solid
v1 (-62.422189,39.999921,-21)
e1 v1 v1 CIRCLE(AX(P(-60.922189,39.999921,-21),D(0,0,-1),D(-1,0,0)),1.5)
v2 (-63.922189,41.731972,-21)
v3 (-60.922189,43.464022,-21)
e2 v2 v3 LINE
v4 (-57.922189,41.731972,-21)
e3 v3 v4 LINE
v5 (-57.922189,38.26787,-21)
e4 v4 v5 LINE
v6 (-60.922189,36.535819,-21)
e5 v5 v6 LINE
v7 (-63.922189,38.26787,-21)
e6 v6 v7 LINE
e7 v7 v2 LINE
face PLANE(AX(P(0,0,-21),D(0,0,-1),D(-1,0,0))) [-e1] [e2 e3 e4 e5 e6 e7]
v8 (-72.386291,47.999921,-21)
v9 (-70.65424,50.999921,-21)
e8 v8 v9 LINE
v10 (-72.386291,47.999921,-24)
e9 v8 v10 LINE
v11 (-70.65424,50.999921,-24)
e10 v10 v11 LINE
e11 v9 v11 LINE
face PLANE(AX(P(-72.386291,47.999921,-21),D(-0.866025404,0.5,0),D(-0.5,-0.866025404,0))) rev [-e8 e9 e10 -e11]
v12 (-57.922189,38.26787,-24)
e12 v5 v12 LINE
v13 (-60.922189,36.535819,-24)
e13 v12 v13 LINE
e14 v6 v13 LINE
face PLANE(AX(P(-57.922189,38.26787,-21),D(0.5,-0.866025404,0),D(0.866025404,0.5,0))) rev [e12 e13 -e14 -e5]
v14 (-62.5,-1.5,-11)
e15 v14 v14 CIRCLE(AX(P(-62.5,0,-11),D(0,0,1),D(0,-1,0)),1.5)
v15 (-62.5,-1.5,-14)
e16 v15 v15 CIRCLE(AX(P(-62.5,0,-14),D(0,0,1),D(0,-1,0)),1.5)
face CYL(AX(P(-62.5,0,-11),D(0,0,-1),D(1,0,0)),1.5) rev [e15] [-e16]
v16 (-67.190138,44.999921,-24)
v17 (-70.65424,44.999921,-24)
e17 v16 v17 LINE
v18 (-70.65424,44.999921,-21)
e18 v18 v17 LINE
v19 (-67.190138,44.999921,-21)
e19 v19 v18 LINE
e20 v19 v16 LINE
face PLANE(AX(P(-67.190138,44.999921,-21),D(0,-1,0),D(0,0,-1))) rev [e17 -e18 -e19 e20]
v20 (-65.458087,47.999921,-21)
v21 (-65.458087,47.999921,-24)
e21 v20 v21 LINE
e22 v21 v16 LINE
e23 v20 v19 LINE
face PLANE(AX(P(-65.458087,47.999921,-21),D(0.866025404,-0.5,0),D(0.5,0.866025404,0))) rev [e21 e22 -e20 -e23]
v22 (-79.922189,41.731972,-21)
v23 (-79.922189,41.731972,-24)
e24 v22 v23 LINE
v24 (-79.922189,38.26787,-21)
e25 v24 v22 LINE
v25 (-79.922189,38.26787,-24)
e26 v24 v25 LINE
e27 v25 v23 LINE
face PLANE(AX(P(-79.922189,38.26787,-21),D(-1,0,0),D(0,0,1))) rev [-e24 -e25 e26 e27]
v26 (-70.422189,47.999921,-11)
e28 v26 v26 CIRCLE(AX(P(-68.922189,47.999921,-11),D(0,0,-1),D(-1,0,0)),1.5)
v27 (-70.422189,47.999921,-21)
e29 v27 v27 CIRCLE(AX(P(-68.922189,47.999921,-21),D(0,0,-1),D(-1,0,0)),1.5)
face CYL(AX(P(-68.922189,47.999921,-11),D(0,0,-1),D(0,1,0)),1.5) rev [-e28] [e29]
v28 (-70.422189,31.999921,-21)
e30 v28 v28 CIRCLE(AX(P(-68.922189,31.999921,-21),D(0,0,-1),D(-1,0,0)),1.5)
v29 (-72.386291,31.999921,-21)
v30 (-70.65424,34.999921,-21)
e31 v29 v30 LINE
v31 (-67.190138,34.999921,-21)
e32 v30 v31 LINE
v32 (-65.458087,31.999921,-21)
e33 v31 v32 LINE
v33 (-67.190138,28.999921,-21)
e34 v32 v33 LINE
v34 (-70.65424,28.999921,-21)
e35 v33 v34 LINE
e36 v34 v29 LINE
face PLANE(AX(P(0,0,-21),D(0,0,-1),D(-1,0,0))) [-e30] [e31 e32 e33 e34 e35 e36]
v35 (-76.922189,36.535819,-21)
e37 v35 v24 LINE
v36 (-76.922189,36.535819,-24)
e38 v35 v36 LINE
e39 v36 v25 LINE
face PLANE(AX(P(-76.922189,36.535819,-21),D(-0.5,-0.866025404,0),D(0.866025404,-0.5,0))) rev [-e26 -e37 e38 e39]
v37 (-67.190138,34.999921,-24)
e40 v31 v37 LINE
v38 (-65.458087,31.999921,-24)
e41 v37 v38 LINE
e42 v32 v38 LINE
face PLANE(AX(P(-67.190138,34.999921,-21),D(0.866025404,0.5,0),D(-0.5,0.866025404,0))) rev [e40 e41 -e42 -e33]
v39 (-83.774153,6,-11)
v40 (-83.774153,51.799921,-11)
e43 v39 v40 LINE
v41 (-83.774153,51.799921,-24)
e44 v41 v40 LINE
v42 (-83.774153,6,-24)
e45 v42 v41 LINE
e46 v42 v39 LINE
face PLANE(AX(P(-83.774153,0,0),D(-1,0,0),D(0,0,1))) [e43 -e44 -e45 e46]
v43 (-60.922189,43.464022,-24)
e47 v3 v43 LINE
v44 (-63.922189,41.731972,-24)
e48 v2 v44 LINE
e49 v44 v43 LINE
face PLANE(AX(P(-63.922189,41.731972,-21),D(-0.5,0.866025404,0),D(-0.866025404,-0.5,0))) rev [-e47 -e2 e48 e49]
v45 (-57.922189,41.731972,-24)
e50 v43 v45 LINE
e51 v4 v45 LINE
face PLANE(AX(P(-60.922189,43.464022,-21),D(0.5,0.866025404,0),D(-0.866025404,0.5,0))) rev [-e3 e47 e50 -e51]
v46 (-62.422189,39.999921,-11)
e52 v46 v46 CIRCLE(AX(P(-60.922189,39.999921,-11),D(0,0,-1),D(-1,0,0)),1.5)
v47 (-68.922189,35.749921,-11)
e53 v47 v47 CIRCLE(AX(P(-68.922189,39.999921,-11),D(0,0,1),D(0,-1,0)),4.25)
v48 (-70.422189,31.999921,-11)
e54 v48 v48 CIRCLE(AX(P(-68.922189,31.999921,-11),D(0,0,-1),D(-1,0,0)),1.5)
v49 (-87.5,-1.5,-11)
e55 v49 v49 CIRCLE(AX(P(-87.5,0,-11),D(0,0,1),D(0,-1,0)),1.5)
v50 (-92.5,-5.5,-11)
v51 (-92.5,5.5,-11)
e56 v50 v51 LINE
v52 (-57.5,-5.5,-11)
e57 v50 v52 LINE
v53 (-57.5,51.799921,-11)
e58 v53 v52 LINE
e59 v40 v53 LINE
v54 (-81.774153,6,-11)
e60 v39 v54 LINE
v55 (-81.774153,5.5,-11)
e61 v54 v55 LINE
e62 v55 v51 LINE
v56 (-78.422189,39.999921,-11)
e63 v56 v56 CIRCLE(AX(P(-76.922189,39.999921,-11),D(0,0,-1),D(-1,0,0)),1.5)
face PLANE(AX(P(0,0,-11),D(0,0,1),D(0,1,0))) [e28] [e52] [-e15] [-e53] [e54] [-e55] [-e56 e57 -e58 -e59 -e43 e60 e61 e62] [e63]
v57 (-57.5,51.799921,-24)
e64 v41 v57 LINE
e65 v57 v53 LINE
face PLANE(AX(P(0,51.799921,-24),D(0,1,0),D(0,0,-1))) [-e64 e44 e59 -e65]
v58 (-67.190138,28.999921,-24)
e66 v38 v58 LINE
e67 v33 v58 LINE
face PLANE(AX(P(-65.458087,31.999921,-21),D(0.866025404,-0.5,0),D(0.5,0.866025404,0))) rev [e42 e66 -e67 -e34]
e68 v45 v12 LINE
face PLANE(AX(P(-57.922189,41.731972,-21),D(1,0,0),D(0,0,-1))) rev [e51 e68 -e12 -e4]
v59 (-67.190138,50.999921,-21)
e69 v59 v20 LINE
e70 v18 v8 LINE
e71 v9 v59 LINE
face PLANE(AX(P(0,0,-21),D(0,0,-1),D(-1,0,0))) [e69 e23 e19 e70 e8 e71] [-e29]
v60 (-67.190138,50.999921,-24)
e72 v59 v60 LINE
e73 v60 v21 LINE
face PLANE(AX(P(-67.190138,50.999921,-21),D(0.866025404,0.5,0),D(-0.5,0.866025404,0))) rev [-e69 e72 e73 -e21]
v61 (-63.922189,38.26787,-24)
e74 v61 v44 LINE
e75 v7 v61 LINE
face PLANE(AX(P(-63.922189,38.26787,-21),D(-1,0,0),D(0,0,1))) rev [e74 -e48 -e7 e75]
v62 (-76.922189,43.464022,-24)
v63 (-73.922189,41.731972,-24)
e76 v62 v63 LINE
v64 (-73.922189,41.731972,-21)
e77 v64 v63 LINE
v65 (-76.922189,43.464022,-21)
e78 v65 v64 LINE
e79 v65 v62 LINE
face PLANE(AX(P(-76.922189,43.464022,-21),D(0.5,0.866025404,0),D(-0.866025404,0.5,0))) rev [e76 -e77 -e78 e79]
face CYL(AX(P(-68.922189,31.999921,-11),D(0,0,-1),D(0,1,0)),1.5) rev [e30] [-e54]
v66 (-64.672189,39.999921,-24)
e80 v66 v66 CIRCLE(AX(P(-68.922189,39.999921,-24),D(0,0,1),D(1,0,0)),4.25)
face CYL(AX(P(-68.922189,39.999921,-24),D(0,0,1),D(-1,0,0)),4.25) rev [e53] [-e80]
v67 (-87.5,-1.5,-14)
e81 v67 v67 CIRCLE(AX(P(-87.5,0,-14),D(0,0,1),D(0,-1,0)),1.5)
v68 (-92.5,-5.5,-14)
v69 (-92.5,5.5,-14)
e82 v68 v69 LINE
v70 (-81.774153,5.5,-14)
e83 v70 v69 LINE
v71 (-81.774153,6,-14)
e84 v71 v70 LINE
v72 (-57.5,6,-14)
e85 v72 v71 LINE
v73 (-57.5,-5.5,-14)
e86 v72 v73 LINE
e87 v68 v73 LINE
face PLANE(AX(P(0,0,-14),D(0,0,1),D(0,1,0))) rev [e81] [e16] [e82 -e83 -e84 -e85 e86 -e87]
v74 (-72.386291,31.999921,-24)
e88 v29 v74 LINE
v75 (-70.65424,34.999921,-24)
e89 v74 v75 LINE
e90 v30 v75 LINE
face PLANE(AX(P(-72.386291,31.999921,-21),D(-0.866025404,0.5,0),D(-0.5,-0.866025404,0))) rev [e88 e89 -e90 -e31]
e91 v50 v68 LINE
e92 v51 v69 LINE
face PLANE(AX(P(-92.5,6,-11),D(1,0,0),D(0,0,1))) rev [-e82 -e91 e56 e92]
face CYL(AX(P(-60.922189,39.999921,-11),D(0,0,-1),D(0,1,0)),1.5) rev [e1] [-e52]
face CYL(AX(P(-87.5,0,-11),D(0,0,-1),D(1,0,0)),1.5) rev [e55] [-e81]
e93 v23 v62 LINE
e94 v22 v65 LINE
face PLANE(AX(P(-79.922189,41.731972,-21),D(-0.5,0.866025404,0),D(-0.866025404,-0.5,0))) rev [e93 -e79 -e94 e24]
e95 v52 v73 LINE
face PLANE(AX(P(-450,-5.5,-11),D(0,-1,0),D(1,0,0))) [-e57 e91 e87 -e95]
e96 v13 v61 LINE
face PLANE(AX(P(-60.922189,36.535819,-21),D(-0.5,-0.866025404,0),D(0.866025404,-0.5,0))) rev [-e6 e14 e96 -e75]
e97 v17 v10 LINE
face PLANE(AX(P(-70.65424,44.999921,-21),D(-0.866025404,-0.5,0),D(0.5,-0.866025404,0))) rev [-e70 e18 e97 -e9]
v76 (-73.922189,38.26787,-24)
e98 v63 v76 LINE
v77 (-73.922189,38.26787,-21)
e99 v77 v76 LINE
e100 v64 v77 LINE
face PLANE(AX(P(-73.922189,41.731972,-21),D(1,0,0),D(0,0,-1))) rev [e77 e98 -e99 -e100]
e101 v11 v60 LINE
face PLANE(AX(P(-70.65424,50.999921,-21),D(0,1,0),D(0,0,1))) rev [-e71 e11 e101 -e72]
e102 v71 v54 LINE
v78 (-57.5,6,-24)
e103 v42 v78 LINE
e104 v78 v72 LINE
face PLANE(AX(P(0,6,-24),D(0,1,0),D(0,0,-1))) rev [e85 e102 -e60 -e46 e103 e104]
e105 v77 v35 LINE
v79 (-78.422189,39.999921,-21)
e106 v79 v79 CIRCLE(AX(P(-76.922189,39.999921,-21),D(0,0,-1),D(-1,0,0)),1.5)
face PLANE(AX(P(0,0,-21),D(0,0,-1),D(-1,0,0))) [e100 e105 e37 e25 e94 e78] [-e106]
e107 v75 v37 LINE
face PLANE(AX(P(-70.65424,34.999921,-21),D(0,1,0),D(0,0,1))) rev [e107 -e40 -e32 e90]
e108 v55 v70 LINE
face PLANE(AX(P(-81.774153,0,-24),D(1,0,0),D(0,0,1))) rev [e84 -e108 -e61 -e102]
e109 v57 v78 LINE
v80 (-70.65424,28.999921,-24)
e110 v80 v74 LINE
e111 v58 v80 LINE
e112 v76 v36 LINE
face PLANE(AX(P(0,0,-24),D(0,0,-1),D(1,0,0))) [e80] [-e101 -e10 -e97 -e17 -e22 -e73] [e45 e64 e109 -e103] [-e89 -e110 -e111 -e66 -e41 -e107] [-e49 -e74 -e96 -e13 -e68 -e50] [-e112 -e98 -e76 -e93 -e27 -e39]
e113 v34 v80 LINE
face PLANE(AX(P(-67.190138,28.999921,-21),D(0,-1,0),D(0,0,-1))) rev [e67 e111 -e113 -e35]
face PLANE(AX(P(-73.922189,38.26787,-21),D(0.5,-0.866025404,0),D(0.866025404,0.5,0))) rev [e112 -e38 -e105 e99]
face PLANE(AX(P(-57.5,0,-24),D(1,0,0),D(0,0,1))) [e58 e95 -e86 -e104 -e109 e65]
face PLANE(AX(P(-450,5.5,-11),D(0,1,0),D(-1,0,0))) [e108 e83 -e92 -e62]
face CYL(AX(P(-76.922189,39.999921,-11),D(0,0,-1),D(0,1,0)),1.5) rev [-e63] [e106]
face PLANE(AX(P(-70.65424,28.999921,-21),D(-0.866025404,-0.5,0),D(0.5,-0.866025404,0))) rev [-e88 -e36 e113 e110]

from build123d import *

# Parameters (mm, degrees)
SKETCH1_W                   = 24.274152735811775
SKETCH1_H                   = 45.79992080637105
SKETCH1_R                   = 4.250000000000006
BOSS_EXTRUDE1_DEPTH         = 2
SKETCH1_3_W                 = 24.274152735811775
SKETCH1_3_H                 = 2
SKETCH1_3_H_2               = 43.79992080637105
BOSS_EXTRUDE2_DEPTH         = 8
BOSS_EXTRUDE3_START         = -8
SKETCH1_4_W                 = 24.274152735811775
SKETCH1_4_H                 = 43.79992080637105
SKETCH1_4_H_2               = 2
SKETCH1_4_R                 = 1.500000000000004
SKETCH1_4_R_2               = 1.4999999999999971
BOSS_EXTRUDE3_DEPTH         = 3
BODY_MOVE_COPY1_START       = -81.774152736
BODY_MOVE_COPY1_OUTLINE_W   = 13.599999999999994
BODY_MOVE_COPY1_OUTLINE_H   = 22
BODY_MOVE_COPY1_DEPTH       = 24.274152736
BODY_MOVE_COPY1_2_OUTLINE_W = 13.599999999999994
BODY_MOVE_COPY1_2_OUTLINE_H = 22
BODY_MOVE_COPY1_2_DEPTH     = 8.925981831
BODY_MOVE_COPY1_START_2     = -64.996207244
BODY_MOVE_COPY1_3_OUTLINE_W = 13.599999999999994
BODY_MOVE_COPY1_3_OUTLINE_H = 22
BODY_MOVE_COPY1_3_DEPTH     = 7.496207244
BODY_MOVE_COPY1_START_3     = -92.5
BODY_MOVE_COPY1_4_OUTLINE_W = 11
BODY_MOVE_COPY1_4_OUTLINE_H = 6.000000000000002
BODY_MOVE_COPY1_4_DEPTH     = 10.725847264
BODY_MOVE_COPY1_START_4     = -11
BODY_MOVE_COPY1_5_DEPTH     = 13
BODY_MOVE_COPY1_START_5     = -22
BODY_MOVE_COPY1_6_OUTLINE_R = 1.5
BODY_MOVE_COPY1_6_DEPTH     = 11
BODY_MOVE_COPY1_START_6     = -24
BODY_MOVE_COPY1_7_OUTLINE_R = 4.25
BODY_MOVE_COPY1_7_DEPTH     = 2
SKETCH2_R                   = 2.4999999999999956
SKETCH2_R_2                 = 1.7499999999999991
BOSS_EXTRUDE4_DEPTH         = 2
SKETCH2_R_3                 = 2.499999999999995
SKETCH2_R_4                 = 1.7500000000000013
BOSS_EXTRUDE4_2_DEPTH       = 2
BOSS_EXTRUDE5_START         = 2
SKETCH2_3_R                 = 2.499999999999995
SKETCH2_3_R_2               = 2.4999999999999956
BOSS_EXTRUDE5_DEPTH         = 10
BOSS_EXTRUDE8_START         = 2
BOSS_EXTRUDE8_OUTLINE_R     = 2.5
BOSS_EXTRUDE8_OUTLINE_R_2   = 1.75
BOSS_EXTRUDE8_DEPTH         = 10
BOSS_EXTRUDE8_2_OUTLINE_R   = 2.5
BOSS_EXTRUDE8_2_OUTLINE_R_2 = 1.5
BOSS_EXTRUDE8_2_DEPTH       = 12
BOSS_EXTRUDE9_START         = -22
SKETCH1_5_R                 = 4.250000000000006
BOSS_EXTRUDE9_DEPTH         = 11
SKETCH3_R                   = 4.250000000000006
SKETCH3_R_2                 = 1.4999999999999973
SKETCH3_R_3                 = 1.4999999999999822
CUT_EXTRUDE1_DEPTH          = 3
SKETCH3_2_R                 = 1.4999999999999822
SKETCH3_2_R_2               = 1.4999999999999973
CUT_EXTRUDE2_DEPTH          = 112.56199728722034
CUT_EXTRUDE3_DEPTH          = 69.81517846049216
BOSS_EXTRUDE10_DEPTH        = 2


with BuildPart() as part:
    # Sketch1 → Boss-Extrude1 (new body)
    with BuildSketch(Plane.XY):
        with Locations((-69.63707636790589, 28.899960403185524)):
            Rectangle(SKETCH1_W, SKETCH1_H)
        with Locations((-68.92218907483289, 39.99992080637105)):
            Circle(SKETCH1_R, mode=Mode.SUBTRACT)
    extrude(amount=BOSS_EXTRUDE1_DEPTH)

    # Sketch1<3> → Boss-Extrude2 (add)
    # profile 1 of 2: a face of its own
    with BuildSketch(Plane.XY):
        with Locations((-69.63707636790589, 7)):
            Rectangle(SKETCH1_3_W, SKETCH1_3_H)
    # profile 2 of 2: a face of its own
    with BuildSketch(Plane.XY):
        with Locations((-69.63707636790589, 29.899960403185524)):
            Rectangle(SKETCH1_3_W, SKETCH1_3_H_2)
        Polygon((-61.07022541385397, 39.99992080637103), (-64.99620724434341, 33.19992080637105), (-72.84817090532232, 33.19992080637105), (-76.77415273581178, 39.999920806371065), (-72.84817090532235, 46.79992080637104), (-64.99620724434344, 46.79992080637104), align=None, mode=Mode.SUBTRACT)
    extrude(amount=-BOSS_EXTRUDE2_DEPTH)

    # Sketch1<4> → Boss-Extrude3 (add)
    # profile 1 of 7: a face of its own
    with BuildSketch(Plane.XY.offset(BOSS_EXTRUDE3_START)):
        with Locations((-69.63707636790589, 29.899960403185524)):
            Rectangle(SKETCH1_4_W, SKETCH1_4_H)
        Polygon((-61.07022541385397, 39.99992080637103), (-64.99620724434341, 33.19992080637105), (-72.84817090532232, 33.19992080637105), (-76.77415273581178, 39.999920806371065), (-72.84817090532235, 46.79992080637104), (-64.99620724434344, 46.79992080637104), align=None, mode=Mode.SUBTRACT)
    # profile 2 of 7: a face of its own
    with BuildSketch(Plane.XY.offset(BOSS_EXTRUDE3_START)):
        Polygon((-67.5, -5.500000000000001), (-67.5, 5.5), (-57.5, 5.5), (-57.49999999999999, -5.5), align=None)
        Polygon((-59.03589838486225, -2.082e-14), (-60.76794919243112, 2.999999999999975), (-64.23205080756887, 2.999999999999975), (-65.96410161513775, -2.776e-14), (-64.23205080756888, -3.0000000000000098), (-60.767949192431125, -3.0000000000000098), align=None, mode=Mode.SUBTRACT)
    # profile 3 of 7: a face of its own
    with BuildSketch(Plane.XY.offset(BOSS_EXTRUDE3_START)):
        Polygon((-67.5, 5.5), (-57.5, 5.5), (-57.5, 6), (-81.77415273581178, 6), (-81.77415273581178, 5.5), align=None)
    # profile 4 of 7: a face of its own
    with BuildSketch(Plane.XY.offset(BOSS_EXTRUDE3_START)):
        with Locations((-69.63707636790589, 7)):
            Rectangle(SKETCH1_4_W, SKETCH1_4_H_2)
    # profile 5 of 7: a face of its own
    with BuildSketch(Plane.XY.offset(BOSS_EXTRUDE3_START)):
        Polygon((-81.77415273581178, -5.500000000000003), (-67.5, -5.500000000000001), (-67.5, 5.499999999999999), (-81.77415273581178, 5.499999999999997), align=None)
    # profile 6 of 7: a face of its own
    with BuildSketch(Plane.XY.offset(BOSS_EXTRUDE3_START)):
        Polygon((-60.767949192431125, -3.0000000000000098), (-59.03589838486225, -2.082e-14), (-60.76794919243112, 2.999999999999975), (-64.23205080756887, 2.999999999999975), (-65.96410161513775, -2.776e-14), (-64.23205080756888, -3.0000000000000098), align=None)
        with Locations(Location((-62.5, 0, 0), (0, 0, 270))):
            Circle(SKETCH1_4_R, mode=Mode.SUBTRACT)
    # profile 7 of 7: a face of its own
    with BuildSketch(Plane.XY.offset(BOSS_EXTRUDE3_START)):
        Polygon((-92.5, -5.500000000000004), (-92.5, 5.499999999999996), (-81.77415273581178, 5.499999999999997), (-81.77415273581178, -5.500000000000003), align=None)
        with Locations(Location((-87.5, -2.42e-15, 0), (0, 0, 270))):
            Circle(SKETCH1_4_R_2, mode=Mode.SUBTRACT)
    extrude(amount=-BOSS_EXTRUDE3_DEPTH)

    # Body-Move/Copy1: read off the stored shape, not the designer's step
    # Body-Move/Copy1 outline → Body-Move/Copy1 (add)
    with BuildSketch(Plane.YZ.offset(BODY_MOVE_COPY1_START)):
        Polygon((6, -24), (51.799920806, -24), (51.799920806, 2), (6, 2), (6, -8), (-5.5, -8), (-5.5, -14), (6, -14), align=None)
        with Locations((39.999920806, -11)):
            Rectangle(BODY_MOVE_COPY1_OUTLINE_W, BODY_MOVE_COPY1_OUTLINE_H, mode=Mode.SUBTRACT)
    extrude(amount=BODY_MOVE_COPY1_DEPTH)

    # Body-Move_Copy1 2 outline → Body-Move_Copy1 2 (add)
    with BuildSketch(Plane.YZ.offset(BODY_MOVE_COPY1_START)):
        with Locations((39.999920806, -11)):
            Rectangle(BODY_MOVE_COPY1_2_OUTLINE_W, BODY_MOVE_COPY1_2_OUTLINE_H)
    extrude(amount=BODY_MOVE_COPY1_2_DEPTH)

    # Body-Move_Copy1 3 outline → Body-Move_Copy1 3 (add)
    with BuildSketch(Plane.YZ.offset(BODY_MOVE_COPY1_START_2)):
        with Locations((39.999920806, -11)):
            Rectangle(BODY_MOVE_COPY1_3_OUTLINE_W, BODY_MOVE_COPY1_3_OUTLINE_H)
    extrude(amount=BODY_MOVE_COPY1_3_DEPTH)

    # Body-Move_Copy1 4 outline → Body-Move_Copy1 4 (add)
    with BuildSketch(Plane.YZ.offset(BODY_MOVE_COPY1_START_3)):
        with Locations((0, -11)):
            Rectangle(BODY_MOVE_COPY1_4_OUTLINE_W, BODY_MOVE_COPY1_4_OUTLINE_H)
    extrude(amount=BODY_MOVE_COPY1_4_DEPTH)

    # Body-Move_Copy1 5 outline → Body-Move_Copy1 5 (cut)
    with BuildSketch(Plane.XY.offset(BODY_MOVE_COPY1_START_4)):
        Polygon((-81.774152736, 51.799920806), (-81.774152736, 5.5), (-92.5, 5.5), (-92.5, -5.5), (-57.5, -5.5), (-57.5, 51.799920806), align=None)
    extrude(amount=BODY_MOVE_COPY1_5_DEPTH, mode=Mode.SUBTRACT)

    # Body-Move_Copy1 6 outline → Body-Move_Copy1 6 (cut)
    with BuildSketch(Plane.XY.offset(BODY_MOVE_COPY1_START_5)):
        Polygon((-64.996207244, 33.199920806), (-61.070225414, 39.999920806), (-64.996207244, 46.799920806), align=None)
        Polygon((-72.848170905, 46.799920806), (-76.774152736, 39.999920806), (-72.848170905, 33.199920806), align=None)
        with Locations((-87.5, 0)):
            Circle(BODY_MOVE_COPY1_6_OUTLINE_R)
        with Locations((-62.5, 0)):
            Circle(BODY_MOVE_COPY1_6_OUTLINE_R)
    extrude(amount=BODY_MOVE_COPY1_6_DEPTH, mode=Mode.SUBTRACT)

    # Body-Move_Copy1 7 outline → Body-Move_Copy1 7 (cut)
    with BuildSketch(Plane.XY.offset(BODY_MOVE_COPY1_START_6)):
        with Locations((-68.922189075, 39.999920806)):
            Circle(BODY_MOVE_COPY1_7_OUTLINE_R)
    extrude(amount=BODY_MOVE_COPY1_7_DEPTH, mode=Mode.SUBTRACT)

    # Sketch2<3> → Boss-Extrude5 (add)
    with BuildSketch(Plane(origin=(-1.1724e-13, 16.499999999999897, 6.01e-15), x_dir=(1, 7.11e-15, 0), z_dir=(-7.11e-15, 1, 3.6e-16)).offset(BOSS_EXTRUDE5_START)):
        Polygon((-97.77415273581177, 38.249999999999936), (-97.77415273581177, 10.999999999999943), (-81.77415273581173, 10.999999999999943), (-81.77415273581171, 38.249999999999936), align=None)
        with Locations(Location((-95.02415273581177, 14.249999999999943, 0), (0, 0, 180))):
            Circle(SKETCH2_3_R, mode=Mode.SUBTRACT)
        with Locations(Location((-95.02415273581174, 33.249999999999936, 0), (0, 0, 180))):
            Circle(SKETCH2_3_R_2, mode=Mode.SUBTRACT)
    extrude(amount=BOSS_EXTRUDE5_DEPTH)

    # Sketch1<5> → Boss-Extrude9 (add)
    with BuildSketch(Plane.XY.offset(BOSS_EXTRUDE9_START)):
        Polygon((-76.77415273581178, 39.999920806371065), (-72.84817090532232, 33.19992080637105), (-64.99620724434341, 33.19992080637105), (-61.07022541385397, 39.99992080637103), (-64.99620724434344, 46.79992080637104), (-72.84817090532235, 46.79992080637104), align=None)
        with Locations(Location((-68.92218907483289, 39.99992080637105, 0), (0, 0, 270))):
            Circle(SKETCH1_5_R, mode=Mode.SUBTRACT)
    extrude(amount=BOSS_EXTRUDE9_DEPTH)

    # Sketch3 → Cut-Extrude1 (cut)
    # profile 1 of 5: a face of its own
    with BuildSketch(Plane(origin=(0, 0, -23.99999999999991), x_dir=(-1, 0, 0), z_dir=(0, 0, -1))):
        with Locations(Location((68.92218907483289, 39.99992080637105, 0), (0, 0, 270))):
            Circle(SKETCH3_R)
    # profile 2 of 5: a face of its own
    with BuildSketch(Plane(origin=(0, 0, -23.99999999999991), x_dir=(-1, 0, 0), z_dir=(0, 0, -1))):
        Polygon((67.190138267264, 50.999920806371065), (65.45808745969511, 47.999920806371065), (67.190138267264, 44.999920806371065), (70.65423988240175, 44.999920806371065), (72.38629068997062, 47.999920806371065), (70.65423988240177, 50.999920806371065), align=None)
        with Locations(Location((68.92218907483289, 47.99992080637105, 0), (0, 0, 90))):
            Circle(SKETCH3_R_2, mode=Mode.SUBTRACT)
    # profile 3 of 5: a face of its own
    with BuildSketch(Plane(origin=(0, 0, -23.99999999999991), x_dir=(-1, 0, 0), z_dir=(0, 0, -1))):
        Polygon((57.92218907483287, 38.26786999880217), (60.92218907483287, 36.535819191233294), (63.922189074832865, 38.267869998802176), (63.922189074832865, 41.73197161393993), (60.922189074832865, 43.464022421508815), (57.92218907483287, 41.73197161393994), align=None)
        with Locations(Location((60.922189074832886, 39.99992080637105, 0), (0, 0, 90))):
            Circle(SKETCH3_R_3, mode=Mode.SUBTRACT)
    # profile 4 of 5: a face of its own
    with BuildSketch(Plane(origin=(0, 0, -23.99999999999991), x_dir=(-1, 0, 0), z_dir=(0, 0, -1))):
        Polygon((79.92218907483291, 41.73197161393995), (76.92218907483289, 43.46402242150882), (73.92218907483291, 41.73197161393994), (73.92218907483291, 38.26786999880218), (76.92218907483291, 36.5358191912333), (79.92218907483291, 38.26786999880217), align=None)
        with Locations(Location((76.92218907483289, 39.999920806371065, 0), (0, 0, 90))):
            Circle(SKETCH3_R_3, mode=Mode.SUBTRACT)
    # profile 5 of 5: a face of its own
    with BuildSketch(Plane(origin=(0, 0, -23.99999999999991), x_dir=(-1, 0, 0), z_dir=(0, 0, -1))):
        Polygon((70.65423988240177, 28.999920806371044), (72.38629068997065, 31.999920806371048), (70.65423988240177, 34.999920806371044), (67.19013826726402, 34.999920806371044), (65.45808745969514, 31.999920806371026), (67.190138267264, 28.999920806371044), align=None)
        with Locations(Location((68.9221890748329, 31.999920806371062, 0), (0, 0, 90))):
            Circle(SKETCH3_R_3, mode=Mode.SUBTRACT)
    extrude(amount=-CUT_EXTRUDE1_DEPTH, mode=Mode.SUBTRACT)

    # Sketch3<2> → Cut-Extrude2 (cut, through all)
    with BuildSketch(Plane(origin=(0, 0, -23.99999999999991), x_dir=(-1, 0, 0), z_dir=(0, 0, -1))):
        with Locations((76.92218907483289, 39.999920806371065)):
            Circle(SKETCH3_2_R)
        with Locations((68.92218907483289, 47.99992080637105)):
            Circle(SKETCH3_2_R_2)
        with Locations((60.922189074832886, 39.99992080637105)):
            Circle(SKETCH3_2_R)
        with Locations((68.9221890748329, 31.999920806371062)):
            Circle(SKETCH3_2_R)
    extrude(amount=-CUT_EXTRUDE2_DEPTH, mode=Mode.SUBTRACT)


with BuildPart() as body_2:
    # Sketch2 → Boss-Extrude4 (new body)
    with BuildSketch(Plane(origin=(-1.1724e-13, 16.499999999999897, 6.01e-15), x_dir=(1, 7.11e-15, 0), z_dir=(-7.11e-15, 1, 3.6e-16))):
        with Locations(Location((-95.02415273581174, 33.249999999999936, 0), (0, 0, 180))):
            Circle(SKETCH2_R)
        with Locations(Location((-95.02415273581202, 33.24999999999956, 0), (0, 0, 180))):
            Circle(SKETCH2_R_2, mode=Mode.SUBTRACT)
    extrude(amount=BOSS_EXTRUDE4_DEPTH)

    # Boss-Extrude8 2 outline → Boss-Extrude8 2 (add)
    with BuildSketch(Plane(origin=(-1.1724e-13, 16.499999999999897, 6.01e-15), x_dir=(1, 7.11e-15, 0), z_dir=(-7.11e-15, 1, 3.6e-16))):
        with Locations((-95.024152736, 33.25)):
            Circle(BOSS_EXTRUDE8_2_OUTLINE_R)
        with Locations((-95.024152736, 33.25)):
            Circle(BOSS_EXTRUDE8_2_OUTLINE_R_2, mode=Mode.SUBTRACT)
    extrude(amount=BOSS_EXTRUDE8_2_DEPTH)


with BuildPart() as body_3:
    # Sketch2 → Boss-Extrude4 2 (new body)
    with BuildSketch(Plane(origin=(-1.1724e-13, 16.499999999999897, 6.01e-15), x_dir=(1, 7.11e-15, 0), z_dir=(-7.11e-15, 1, 3.6e-16))):
        with Locations(Location((-95.02415273581177, 14.249999999999943, 0), (0, 0, 180))):
            Circle(SKETCH2_R_3)
        with Locations(Location((-95.02415273581205, 14.24999999999956, 0), (0, 0, 180))):
            Circle(SKETCH2_R_4, mode=Mode.SUBTRACT)
    extrude(amount=BOSS_EXTRUDE4_2_DEPTH)

    # Boss-Extrude8: read off the stored shape, not the designer's step
    # Boss-Extrude8 outline → Boss-Extrude8 (add)
    with BuildSketch(Plane(origin=(-1.1724e-13, 16.499999999999897, 6.01e-15), x_dir=(1, 7.11e-15, 0), z_dir=(-7.11e-15, 1, 3.6e-16)).offset(BOSS_EXTRUDE8_START)):
        with Locations((-95.024152736, 14.25)):
            Circle(BOSS_EXTRUDE8_OUTLINE_R)
        with Locations((-95.024152736, 14.25)):
            Circle(BOSS_EXTRUDE8_OUTLINE_R_2, mode=Mode.SUBTRACT)
    extrude(amount=BOSS_EXTRUDE8_DEPTH)


with BuildPart() as cut_extrude3_tool:
    # Sketch4 → Cut-Extrude3 (new, through all)
    with BuildSketch(Plane.ZY.offset(81.77415273581178)):
        Polygon((-55.24015463130638, 6), (-23.99999999999991, 6), (-23.99999999999991, 18.499999999999318), (-23.99999999999991, 51.79992080637104), (-23.99999999999991, 75.17738748504144), (-55.24015463130638, 75.17738748504144), align=None)
        Polygon((-23.99999999999991, 18.499999999999318), (-23.99999999999991, 6), (-13.999999999999954, 6), (-10.999999999999954, 6), (-10.999999999999954, 18.499999999999314), align=None)
        Polygon((-23.99999999999991, 51.79992080637104), (-23.99999999999991, 18.499999999999318), (-10.999999999999954, 18.499999999999314), (-10.999999999999954, 51.79992080637105), align=None)
    extrude(amount=CUT_EXTRUDE3_DEPTH)


with BuildPart() as part_1:
    add(part.part)

    # Cut-Extrude3: cut by cut_extrude3_tool
    add(cut_extrude3_tool.part, mode=Mode.SUBTRACT)

    # Sketch4<3> → Boss-Extrude10 (add)
    with BuildSketch(Plane.ZY.offset(81.77415273581178)):
        Polygon((-23.99999999999991, 51.79992080637104), (-23.99999999999991, 18.499999999999318), (-10.999999999999954, 18.499999999999314), (-10.999999999999954, 51.79992080637105), align=None)
        Polygon((-23.99999999999991, 18.499999999999318), (-23.99999999999991, 6), (-13.999999999999954, 6), (-10.999999999999954, 6), (-10.999999999999954, 18.499999999999314), align=None)
    extrude(amount=BOSS_EXTRUDE10_DEPTH)


with BuildPart() as body_2_1:
    add(body_2.part)

    # Cut-Extrude3: cut by cut_extrude3_tool
    add(cut_extrude3_tool.part, mode=Mode.SUBTRACT)


with BuildPart() as body_3_1:
    add(body_3.part)

    # Cut-Extrude3: cut by cut_extrude3_tool
    add(cut_extrude3_tool.part, mode=Mode.SUBTRACT)


solid = part_1.part
